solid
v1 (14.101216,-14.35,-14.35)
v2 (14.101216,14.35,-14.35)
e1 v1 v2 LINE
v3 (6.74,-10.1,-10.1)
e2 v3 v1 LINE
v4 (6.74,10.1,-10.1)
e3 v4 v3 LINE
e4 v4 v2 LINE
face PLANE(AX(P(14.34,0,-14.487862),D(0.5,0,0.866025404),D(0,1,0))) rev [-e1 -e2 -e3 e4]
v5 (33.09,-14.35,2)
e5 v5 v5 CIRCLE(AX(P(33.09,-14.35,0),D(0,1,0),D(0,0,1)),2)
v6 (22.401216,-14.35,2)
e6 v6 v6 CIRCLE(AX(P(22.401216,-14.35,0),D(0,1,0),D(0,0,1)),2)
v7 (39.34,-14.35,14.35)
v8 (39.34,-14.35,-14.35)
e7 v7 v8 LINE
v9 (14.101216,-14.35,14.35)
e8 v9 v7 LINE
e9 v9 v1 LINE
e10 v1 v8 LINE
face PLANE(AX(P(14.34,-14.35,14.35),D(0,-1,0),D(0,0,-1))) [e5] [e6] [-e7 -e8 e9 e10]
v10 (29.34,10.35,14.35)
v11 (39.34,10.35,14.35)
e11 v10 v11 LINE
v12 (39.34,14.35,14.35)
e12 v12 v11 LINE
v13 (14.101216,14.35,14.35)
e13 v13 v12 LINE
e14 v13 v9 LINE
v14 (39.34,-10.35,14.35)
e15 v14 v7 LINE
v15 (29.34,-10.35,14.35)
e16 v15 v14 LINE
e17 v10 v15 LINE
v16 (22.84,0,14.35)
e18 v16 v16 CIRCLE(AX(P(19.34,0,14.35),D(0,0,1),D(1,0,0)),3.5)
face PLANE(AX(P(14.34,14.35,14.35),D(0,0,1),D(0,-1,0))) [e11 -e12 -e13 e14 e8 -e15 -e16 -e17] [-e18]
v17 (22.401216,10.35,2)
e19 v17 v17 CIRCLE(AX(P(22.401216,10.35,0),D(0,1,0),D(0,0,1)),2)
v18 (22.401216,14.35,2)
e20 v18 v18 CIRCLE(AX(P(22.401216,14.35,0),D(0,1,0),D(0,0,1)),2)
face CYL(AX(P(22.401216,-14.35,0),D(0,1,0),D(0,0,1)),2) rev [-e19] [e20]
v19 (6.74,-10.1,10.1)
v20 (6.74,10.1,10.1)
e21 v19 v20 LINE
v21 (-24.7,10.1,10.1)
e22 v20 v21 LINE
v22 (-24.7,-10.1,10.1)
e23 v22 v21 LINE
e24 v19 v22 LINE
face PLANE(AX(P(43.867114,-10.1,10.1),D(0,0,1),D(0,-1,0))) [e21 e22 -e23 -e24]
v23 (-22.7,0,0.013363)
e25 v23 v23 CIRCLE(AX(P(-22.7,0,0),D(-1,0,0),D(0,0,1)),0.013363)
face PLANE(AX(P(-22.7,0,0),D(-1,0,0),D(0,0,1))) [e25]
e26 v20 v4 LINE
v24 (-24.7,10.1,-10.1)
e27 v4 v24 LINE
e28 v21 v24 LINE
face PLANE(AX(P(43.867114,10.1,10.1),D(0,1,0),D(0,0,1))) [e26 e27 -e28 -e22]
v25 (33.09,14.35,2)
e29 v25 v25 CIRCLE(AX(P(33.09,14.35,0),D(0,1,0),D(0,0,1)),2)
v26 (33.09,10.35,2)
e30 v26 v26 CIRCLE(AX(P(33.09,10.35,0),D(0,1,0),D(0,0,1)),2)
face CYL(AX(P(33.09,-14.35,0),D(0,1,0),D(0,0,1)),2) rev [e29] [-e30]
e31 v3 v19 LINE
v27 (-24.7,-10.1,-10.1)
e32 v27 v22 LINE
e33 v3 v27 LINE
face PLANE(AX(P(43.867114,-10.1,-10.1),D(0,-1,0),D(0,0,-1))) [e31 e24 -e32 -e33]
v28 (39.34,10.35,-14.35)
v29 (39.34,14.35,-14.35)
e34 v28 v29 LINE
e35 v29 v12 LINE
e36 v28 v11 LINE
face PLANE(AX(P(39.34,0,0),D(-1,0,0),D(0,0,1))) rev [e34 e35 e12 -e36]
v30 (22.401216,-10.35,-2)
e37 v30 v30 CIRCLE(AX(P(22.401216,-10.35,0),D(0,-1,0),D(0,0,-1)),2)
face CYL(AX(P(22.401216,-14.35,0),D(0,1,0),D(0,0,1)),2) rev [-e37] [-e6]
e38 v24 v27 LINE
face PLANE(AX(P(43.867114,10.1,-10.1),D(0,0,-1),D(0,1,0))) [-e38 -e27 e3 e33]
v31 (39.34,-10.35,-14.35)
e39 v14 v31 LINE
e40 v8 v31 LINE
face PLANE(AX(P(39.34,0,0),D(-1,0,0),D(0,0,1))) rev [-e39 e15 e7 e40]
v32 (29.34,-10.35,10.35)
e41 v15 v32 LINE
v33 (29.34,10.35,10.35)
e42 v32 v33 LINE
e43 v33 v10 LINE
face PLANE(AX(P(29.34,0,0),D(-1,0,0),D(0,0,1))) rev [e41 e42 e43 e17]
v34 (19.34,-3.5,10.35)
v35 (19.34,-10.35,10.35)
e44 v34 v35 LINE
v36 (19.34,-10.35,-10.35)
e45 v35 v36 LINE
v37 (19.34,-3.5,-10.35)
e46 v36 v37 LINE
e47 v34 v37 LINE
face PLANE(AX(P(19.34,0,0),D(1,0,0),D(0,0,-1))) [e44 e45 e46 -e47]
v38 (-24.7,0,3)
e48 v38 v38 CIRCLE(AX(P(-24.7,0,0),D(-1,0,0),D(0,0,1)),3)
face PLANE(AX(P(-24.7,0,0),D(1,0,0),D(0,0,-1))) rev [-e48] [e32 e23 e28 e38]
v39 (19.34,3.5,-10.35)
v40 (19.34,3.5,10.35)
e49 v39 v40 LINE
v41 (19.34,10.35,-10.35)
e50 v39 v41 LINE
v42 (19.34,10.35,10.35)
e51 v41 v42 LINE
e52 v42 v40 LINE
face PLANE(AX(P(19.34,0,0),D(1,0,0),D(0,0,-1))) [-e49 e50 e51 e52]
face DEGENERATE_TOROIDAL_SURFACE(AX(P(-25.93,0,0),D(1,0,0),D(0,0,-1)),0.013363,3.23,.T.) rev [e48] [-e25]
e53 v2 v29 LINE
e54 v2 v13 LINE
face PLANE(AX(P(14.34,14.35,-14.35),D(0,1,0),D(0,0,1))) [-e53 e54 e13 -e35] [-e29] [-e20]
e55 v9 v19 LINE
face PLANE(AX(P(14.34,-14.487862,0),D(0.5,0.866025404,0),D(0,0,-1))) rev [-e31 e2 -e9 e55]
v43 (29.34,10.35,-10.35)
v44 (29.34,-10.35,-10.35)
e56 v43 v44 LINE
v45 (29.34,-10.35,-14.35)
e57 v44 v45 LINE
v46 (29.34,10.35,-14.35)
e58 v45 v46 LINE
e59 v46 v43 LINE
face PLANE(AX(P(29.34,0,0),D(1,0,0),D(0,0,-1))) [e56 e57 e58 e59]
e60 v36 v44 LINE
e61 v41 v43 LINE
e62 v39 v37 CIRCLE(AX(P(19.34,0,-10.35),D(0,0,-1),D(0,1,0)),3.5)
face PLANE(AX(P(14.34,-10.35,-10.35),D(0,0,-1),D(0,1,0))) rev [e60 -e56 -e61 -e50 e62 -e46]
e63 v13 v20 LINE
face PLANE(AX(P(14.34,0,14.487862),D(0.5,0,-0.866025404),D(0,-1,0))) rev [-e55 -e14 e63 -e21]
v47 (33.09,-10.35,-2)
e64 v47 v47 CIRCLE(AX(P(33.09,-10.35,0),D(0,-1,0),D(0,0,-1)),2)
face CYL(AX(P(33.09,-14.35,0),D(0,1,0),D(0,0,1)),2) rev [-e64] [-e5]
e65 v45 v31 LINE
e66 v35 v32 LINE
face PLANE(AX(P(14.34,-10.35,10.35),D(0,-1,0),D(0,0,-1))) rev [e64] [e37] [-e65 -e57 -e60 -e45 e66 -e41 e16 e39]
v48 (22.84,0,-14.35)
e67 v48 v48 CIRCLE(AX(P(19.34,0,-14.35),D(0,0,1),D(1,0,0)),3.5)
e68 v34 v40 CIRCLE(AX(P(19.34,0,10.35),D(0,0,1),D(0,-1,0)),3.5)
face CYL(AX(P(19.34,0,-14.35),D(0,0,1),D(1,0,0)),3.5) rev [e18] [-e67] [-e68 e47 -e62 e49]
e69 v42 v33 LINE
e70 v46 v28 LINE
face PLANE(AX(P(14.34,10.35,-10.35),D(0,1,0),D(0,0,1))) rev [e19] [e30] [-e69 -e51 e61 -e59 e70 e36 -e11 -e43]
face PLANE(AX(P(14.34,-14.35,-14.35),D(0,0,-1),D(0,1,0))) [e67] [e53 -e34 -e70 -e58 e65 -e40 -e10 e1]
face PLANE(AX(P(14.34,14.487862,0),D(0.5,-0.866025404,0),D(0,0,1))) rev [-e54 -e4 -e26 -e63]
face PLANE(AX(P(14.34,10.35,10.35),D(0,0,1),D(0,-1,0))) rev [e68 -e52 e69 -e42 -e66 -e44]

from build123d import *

# Parameters (mm, degrees)
SKETCH1_W                 = 20
SKETCH1_H                 = 20
BOSS_EXTRUDE1_DEPTH       = 20
SKETCH2_W                 = 20
SKETCH2_H                 = 40.2
BOSS_EXTRUDE2_DEPTH       = 64.7
SKETCH3_W                 = 40.9
SKETCH3_H                 = 20.8
CUT_EXTRUDE1_DEPTH        = 90.320210479
SKETCH4_W                 = 11.9
SKETCH4_H                 = 40.2
CUT_EXTRUDE2_DEPTH        = 90.320210479
SKETCH5_R                 = 2.35
CUT_EXTRUDE3_DEPTH        = 10
SKETCH6_R                 = 2.35
CUT_EXTRUDE4_DEPTH        = 10
CHAMFER1_SIZE             = 1
SKETCH7_W                 = 20
SKETCH7_H                 = 10.1
BOSS_EXTRUDE4_DEPTH       = 4.7
SKETCH9_W                 = 20
SKETCH9_H                 = 20
BOSS_EXTRUDE5_DEPTH       = 24.7
SKETCH10_R                = 3
CUT_EXTRUDE5_DEPTH        = 2
FILLET1_R                 = 3.23
SKETCH11_W                = 20.2
SKETCH11_H                = 20.2
SKETCH11_W_2              = 20
SKETCH11_H_2              = 20
BOSS_EXTRUDE6_DEPTH       = 40
SKETCH12_R                = 3.35
BOSS_EXTRUDE7_DEPTH       = 0.1
BOSS_EXTRUDE8_DEPTH       = 0.1
SKETCH14_W                = 27.84115355
SKETCH14_H                = 50.628320261
CUT_EXTRUDE6_DEPTH        = 57.5
BOSS_EXTRUDE10_DEPTH      = 10
BOSS_EXTRUDE10_DEPTH_BACK = 0.96
SKETCH18_W                = 28.7
SKETCH18_H                = 28.7
SKETCH18_W_2              = 20.7
SKETCH18_H_2              = 20.7
SKETCH19_W                = 20.7
SKETCH19_H                = 20.7
BOSS_EXTRUDE11_DEPTH      = 4.04
SKETCH21_W                = 20.7
SKETCH21_H                = 20.7
BOSS_EXTRUDE13_DEPTH      = 0.96
SKETCH22_W                = 28.7
SKETCH22_H                = 28.7
SKETCH22_W_2              = 20.7
SKETCH22_H_2              = 20.7
BOSS_EXTRUDE14_DEPTH      = 14.04
CHAMFER2_SIZE             = 4.387862046
CHAMFER2_SIZE_2           = 7.6
SKETCH24_R                = 3.5
CUT_EXTRUDE7_DEPTH        = 51.76660418
SKETCH25_W                = 4
SKETCH25_H                = 20.7
CUT_EXTRUDE8_DEPTH        = 10
SKETCH26_R                = 2
CUT_EXTRUDE9_DEPTH        = 51.76660418


with BuildPart() as part:
    # Sketch1 → Boss-Extrude1 (new body)
    with BuildSketch(Plane(origin=(0, 0, 0), x_dir=(0, 0, -1), z_dir=(1, 0, 0))):
        Rectangle(SKETCH1_W, SKETCH1_H)
    extrude(amount=BOSS_EXTRUDE1_DEPTH)

    # Sketch2 → Boss-Extrude2 (add)
    with BuildSketch(Plane(origin=(20, 0, 0), x_dir=(0, 0, -1), z_dir=(1, 0, 0))):
        Rectangle(SKETCH2_W, SKETCH2_H)
    extrude(amount=BOSS_EXTRUDE2_DEPTH)

    # Sketch3 → Cut-Extrude1 (cut, through all)
    with BuildSketch(Plane.XY.offset(10)):
        with Locations((52.35, 0)):
            Rectangle(SKETCH3_W, SKETCH3_H)
    extrude(amount=-CUT_EXTRUDE1_DEPTH, mode=Mode.SUBTRACT)

    # Sketch4 → Cut-Extrude2 (cut, through all)
    with BuildSketch(Plane.XY.offset(10)):
        with Locations((78.75, 0)):
            Rectangle(SKETCH4_W, SKETCH4_H)
    extrude(amount=-CUT_EXTRUDE2_DEPTH, mode=Mode.SUBTRACT)

    # Sketch5 → Cut-Extrude3 (cut)
    with BuildSketch(Plane.XY.offset(10)):
        with Locations((28.01, 4.9)):
            Circle(SKETCH5_R)
        with Locations(Location((28.01, -4.9, 0), (0, 0, 180))):
            Circle(SKETCH5_R)
    extrude(amount=-CUT_EXTRUDE3_DEPTH, mode=Mode.SUBTRACT)

    # Sketch6 → Cut-Extrude4 (cut)
    with BuildSketch(Plane(origin=(72.8, 0, 0), x_dir=(0, 0, -1), z_dir=(1, 0, 0))):
        with Locations((0, -15.25)):
            Circle(SKETCH6_R)
        with Locations(Location((0, 15.25, 0), (0, 0, 180))):
            Circle(SKETCH6_R)
    extrude(amount=-CUT_EXTRUDE4_DEPTH, mode=Mode.SUBTRACT)

    # Chamfer1
    chamfer1_edges = [part.edges().sort_by_distance(p)[0] for p in [
        (25.66, 4.9, 10),
        (30.36, -4.9, 10),
        (72.8, -15.25, 2.35),
        (72.8, 15.25, -2.35),
    ]]
    chamfer(chamfer1_edges, length=CHAMFER1_SIZE)

    # Sketch7 → Boss-Extrude4 (add)
    with BuildSketch(Plane.ZY.offset(-20)):
        with Locations((0, 15.05)):
            Rectangle(SKETCH7_W, SKETCH7_H)
        with Locations((0, -15.05)):
            Rectangle(SKETCH7_W, SKETCH7_H)
    extrude(amount=BOSS_EXTRUDE4_DEPTH)

    # Sketch9 → Boss-Extrude5 (add)
    with BuildSketch(Plane.ZY):
        Rectangle(SKETCH9_W, SKETCH9_H)
    extrude(amount=BOSS_EXTRUDE5_DEPTH)

    # Sketch10 → Cut-Extrude5 (cut)
    with BuildSketch(Plane.ZY.offset(24.7)):
        Circle(SKETCH10_R)
    extrude(amount=-CUT_EXTRUDE5_DEPTH, mode=Mode.SUBTRACT)

    # Fillet1
    # the kernel refuses this fillet: 3.23 mm, written as the material it adds along each edge
    with BuildSketch(Plane(origin=(-22.7, 0, 0), x_dir=(0, 0, 1), z_dir=(0, -1, 0))) as fillet1_piece_1:
        with BuildLine():
            CenterArc((0.013363095, 3.23), FILLET1_R, 270, 67.616447755)
            Line((0.013363095, 0), (0.013363095, -0.0646))
            Line((0.013363095, -0.0646), (3, -0.0646))
            Line((3, -0.0646), (3.0646, 0))
            ThreePointArc((3.0646, 0), (3.0646, 1), (3.059732738, 1.9754))
            Line((3.059732738, 1.9754), (3, 2))
        make_face()
    revolve(axis=Axis((-22.7, 0, 0), (-1, 0, 0)))

    # Sketch11 → Boss-Extrude6 (add)
    with BuildSketch(Plane.ZY.offset(24.7)):
        Rectangle(SKETCH11_W, SKETCH11_H)
        Rectangle(SKETCH11_W_2, SKETCH11_H_2, mode=Mode.SUBTRACT)
    extrude(amount=-BOSS_EXTRUDE6_DEPTH)

    # Sketch12 → Boss-Extrude7 (add)
    with BuildSketch(Plane.XY.offset(10)):
        Polygon((72.8, 20.1), (15.3, 20.1), (15.3, -20.1), (72.8, -20.1), (72.8, -10.4), (31.9, -10.4), (31.9, 10.4), (72.8, 10.4), align=None)
        with Locations(Location((28.01, 4.9, 0), (0, 0, 180))):
            Circle(SKETCH12_R, mode=Mode.SUBTRACT)
        with Locations(Location((28.01, -4.9, 0), (0, 0, 180))):
            Circle(SKETCH12_R, mode=Mode.SUBTRACT)
    extrude(amount=BOSS_EXTRUDE7_DEPTH)

    # Sketch13 → Boss-Extrude8 (add)
    with BuildSketch(Plane(origin=(0, 0, -10), x_dir=(-1, 0, 0), z_dir=(0, 0, -1))):
        Polygon((-72.8, -20.1), (-15.3, -20.1), (-15.3, 20.1), (-72.8, 20.1), (-72.8, 10.4), (-31.9, 10.4), (-31.9, -10.4), (-72.8, -10.4), align=None)
    extrude(amount=BOSS_EXTRUDE8_DEPTH)

    # Sketch14 → Cut-Extrude6 (cut)
    with BuildSketch(Plane(origin=(72.8, 0, 0), x_dir=(0, 0, -1), z_dir=(1, 0, 0))):
        with Locations((-1.3978782, 0.184476051)):
            Rectangle(SKETCH14_W, SKETCH14_H)
    extrude(amount=-CUT_EXTRUDE6_DEPTH, mode=Mode.SUBTRACT)

    # Sketch19 → Boss-Extrude11 (add)
    with BuildSketch(Plane(origin=(15.3, 0, 0), x_dir=(0, 0, -1), z_dir=(1, 0, 0))):
        Rectangle(SKETCH19_W, SKETCH19_H)
    extrude(amount=BOSS_EXTRUDE11_DEPTH)



with BuildPart() as body_2:
    # Sketch18 → Boss-Extrude10 (new, two sides: drawn at the far end of the back side and taken through both)
    with BuildSketch(Plane(origin=(15.3, 0, 0), x_dir=(0, 0, -1), z_dir=(1, 0, 0)).offset(-BOSS_EXTRUDE10_DEPTH_BACK)):
        Rectangle(SKETCH18_W, SKETCH18_H)
        Rectangle(SKETCH18_W_2, SKETCH18_H_2, mode=Mode.SUBTRACT)
    extrude(amount=BOSS_EXTRUDE10_DEPTH + BOSS_EXTRUDE10_DEPTH_BACK)


with BuildPart() as part_1:
    add(part.part)

    add(body_2.part)  # Boss-Extrude13 merges body 2
    # Sketch21 → Boss-Extrude13 (add)
    with BuildSketch(Plane.ZY.offset(-15.3)):
        Rectangle(SKETCH21_W, SKETCH21_H)
    extrude(amount=BOSS_EXTRUDE13_DEPTH)

    # Sketch22 → Boss-Extrude14 (add)
    with BuildSketch(Plane(origin=(25.3, 0, 0), x_dir=(0, 0, -1), z_dir=(1, 0, 0))):
        Rectangle(SKETCH22_W, SKETCH22_H)
        Rectangle(SKETCH22_W_2, SKETCH22_H_2, mode=Mode.SUBTRACT)
    extrude(amount=BOSS_EXTRUDE14_DEPTH)

    # Chamfer2
    # the kernel refuses this chamfer: 7.6, 4.387862046 mm, written as the material it adds along each edge
    with BuildSketch(Plane(origin=(14.34, -10.1, 10.1), x_dir=(0.05789386240267072, -0.9983227437537925, 0), z_dir=(0, 0, -1))) as chamfer2_piece_1_section:
        Polygon((CHAMFER2_SIZE * 0.998322743718, CHAMFER2_SIZE * 0.0578938624006), (-CHAMFER2_SIZE_2 * 0.0578938624027, CHAMFER2_SIZE_2 * 0.998322743754), (0, 0), align=None)
    chamfer2_piece_1 = extrude(amount=20.2, mode=Mode.PRIVATE)
    chamfer2_piece_1 = split(chamfer2_piece_1, bisect_by=Plane(origin=(11.775225799, -14.35, 0), z_dir=(0, 1, 0)), keep=Keep.TOP, mode=Mode.PRIVATE)
    add(chamfer2_piece_1)
    with BuildSketch(Plane(origin=(14.34, -10.1, -10.1), x_dir=(0.05789386240267072, 0, -0.9983227437537925), z_dir=(0, 1, 0))) as chamfer2_piece_2_section:
        Polygon((CHAMFER2_SIZE * 0.998322743718, CHAMFER2_SIZE * 0.0578938624006), (-CHAMFER2_SIZE_2 * 0.0578938624027, CHAMFER2_SIZE_2 * 0.998322743754), (0, 0), align=None)
    chamfer2_piece_2 = extrude(amount=20.2, mode=Mode.PRIVATE)
    chamfer2_piece_2 = split(chamfer2_piece_2, bisect_by=Plane(origin=(11.775225799, 0, -14.35), z_dir=(0, 0, 1)), keep=Keep.TOP, mode=Mode.PRIVATE)
    add(chamfer2_piece_2)
    with BuildSketch(Plane(origin=(14.34, 10.1, -10.1), x_dir=(0.05789386240267072, 0.9983227437537925, 0), z_dir=(0, 0, 1))) as chamfer2_piece_3_section:
        Polygon((CHAMFER2_SIZE * 0.998322743718, CHAMFER2_SIZE * 0.0578938624006), (-CHAMFER2_SIZE_2 * 0.0578938624027, CHAMFER2_SIZE_2 * 0.998322743754), (0, 0), align=None)
    chamfer2_piece_3 = extrude(amount=20.2, mode=Mode.PRIVATE)
    chamfer2_piece_3 = split(chamfer2_piece_3, bisect_by=Plane(origin=(11.775225799, 14.35, 0), z_dir=(0, -1, 0)), keep=Keep.TOP, mode=Mode.PRIVATE)
    add(chamfer2_piece_3)
    with BuildSketch(Plane(origin=(14.34, 10.1, 10.1), x_dir=(0.05789386240267072, 0, 0.9983227437537925), z_dir=(0, -1, 0))) as chamfer2_piece_4_section:
        Polygon((CHAMFER2_SIZE * 0.998322743718, CHAMFER2_SIZE * 0.0578938624006), (-CHAMFER2_SIZE_2 * 0.0578938624027, CHAMFER2_SIZE_2 * 0.998322743754), (0, 0), align=None)
    chamfer2_piece_4 = extrude(amount=20.2, mode=Mode.PRIVATE)
    chamfer2_piece_4 = split(chamfer2_piece_4, bisect_by=Plane(origin=(11.775225799, 0, 14.35), z_dir=(0, 0, -1)), keep=Keep.TOP, mode=Mode.PRIVATE)
    add(chamfer2_piece_4)
    with BuildSketch(Plane(origin=(14.34, 10.1, 10.1), x_dir=(0.05789386240267072, 0, 0.9983227437537925), z_dir=(0, -1, 0))) as chamfer2_piece_5a_section:
        Polygon((CHAMFER2_SIZE * 0.998322743718, CHAMFER2_SIZE * 0.0578938624006), (-CHAMFER2_SIZE_2 * 0.0578938624027, CHAMFER2_SIZE_2 * 0.998322743754), (0, 0), align=None)
    chamfer2_piece_5a = extrude(amount=39.861851735, mode=Mode.PRIVATE)
    chamfer2_piece_5a = split(chamfer2_piece_5a, bisect_by=Plane(origin=(11.775225799, -14.35, 11.489810432), z_dir=(0, 1, 0)), keep=Keep.TOP, mode=Mode.PRIVATE)
    chamfer2_piece_5a = split(chamfer2_piece_5a, bisect_by=Plane(origin=(11.775225799, -12.225, 14.35), z_dir=(0, 0, -1)), keep=Keep.TOP, mode=Mode.PRIVATE)
    chamfer2_piece_5a = split(chamfer2_piece_5a, bisect_by=Plane(origin=(11.775225799, -10.1, 11.489810432), z_dir=(0, -1, 0)), keep=Keep.TOP, mode=Mode.PRIVATE)
    with BuildSketch(Plane(origin=(14.34, -10.1, 29.761851735), x_dir=(0.05789386240267072, -0.9983227437537925, 0), z_dir=(0, 0, -1))) as chamfer2_piece_5b_section:
        Polygon((CHAMFER2_SIZE * 0.998322743718, CHAMFER2_SIZE * 0.0578938624006), (-CHAMFER2_SIZE_2 * 0.0578938624027, CHAMFER2_SIZE_2 * 0.998322743754), (0, 0), align=None)
    chamfer2_piece_5b = extrude(amount=39.861851735, mode=Mode.PRIVATE)
    chamfer2_piece_5b = split(chamfer2_piece_5b, bisect_by=Plane(origin=(11.775225799, -14.35, 12.225), z_dir=(0, 1, 0)), keep=Keep.TOP, mode=Mode.PRIVATE)
    chamfer2_piece_5b = split(chamfer2_piece_5b, bisect_by=Plane(origin=(11.775225799, -11.489810432, 14.35), z_dir=(0, 0, -1)), keep=Keep.TOP, mode=Mode.PRIVATE)
    chamfer2_piece_5b = split(chamfer2_piece_5b, bisect_by=Plane(origin=(11.775225799, -11.489810432, 10.1), z_dir=(0, 0, 1)), keep=Keep.TOP, mode=Mode.PRIVATE)
    chamfer2_piece_5 = chamfer2_piece_5a & chamfer2_piece_5b
    add(chamfer2_piece_5)
    with BuildSketch(Plane(origin=(14.34, -10.1, 10.1), x_dir=(0.05789386240267072, -0.9983227437537925, 0), z_dir=(0, 0, -1))) as chamfer2_piece_6a_section:
        Polygon((CHAMFER2_SIZE * 0.998322743718, CHAMFER2_SIZE * 0.0578938624006), (-CHAMFER2_SIZE_2 * 0.0578938624027, CHAMFER2_SIZE_2 * 0.998322743754), (0, 0), align=None)
    chamfer2_piece_6a = extrude(amount=39.861851735, mode=Mode.PRIVATE)
    chamfer2_piece_6a = split(chamfer2_piece_6a, bisect_by=Plane(origin=(11.775225799, -11.489810432, -14.35), z_dir=(0, 0, 1)), keep=Keep.TOP, mode=Mode.PRIVATE)
    chamfer2_piece_6a = split(chamfer2_piece_6a, bisect_by=Plane(origin=(11.775225799, -14.35, -12.225), z_dir=(0, 1, 0)), keep=Keep.TOP, mode=Mode.PRIVATE)
    chamfer2_piece_6a = split(chamfer2_piece_6a, bisect_by=Plane(origin=(11.775225799, -11.489810432, -10.1), z_dir=(0, 0, -1)), keep=Keep.TOP, mode=Mode.PRIVATE)
    with BuildSketch(Plane(origin=(14.34, -29.761851735, -10.1), x_dir=(0.05789386240267072, 0, -0.9983227437537925), z_dir=(0, 1, 0))) as chamfer2_piece_6b_section:
        Polygon((CHAMFER2_SIZE * 0.998322743718, CHAMFER2_SIZE * 0.0578938624006), (-CHAMFER2_SIZE_2 * 0.0578938624027, CHAMFER2_SIZE_2 * 0.998322743754), (0, 0), align=None)
    chamfer2_piece_6b = extrude(amount=39.861851735, mode=Mode.PRIVATE)
    chamfer2_piece_6b = split(chamfer2_piece_6b, bisect_by=Plane(origin=(11.775225799, -12.225, -14.35), z_dir=(0, 0, 1)), keep=Keep.TOP, mode=Mode.PRIVATE)
    chamfer2_piece_6b = split(chamfer2_piece_6b, bisect_by=Plane(origin=(11.775225799, -14.35, -11.489810432), z_dir=(0, 1, 0)), keep=Keep.TOP, mode=Mode.PRIVATE)
    chamfer2_piece_6b = split(chamfer2_piece_6b, bisect_by=Plane(origin=(11.775225799, -10.1, -11.489810432), z_dir=(0, -1, 0)), keep=Keep.TOP, mode=Mode.PRIVATE)
    chamfer2_piece_6 = chamfer2_piece_6a & chamfer2_piece_6b
    add(chamfer2_piece_6)
    with BuildSketch(Plane(origin=(14.34, -10.1, -10.1), x_dir=(0.05789386240267072, 0, -0.9983227437537925), z_dir=(0, 1, 0))) as chamfer2_piece_7a_section:
        Polygon((CHAMFER2_SIZE * 0.998322743718, CHAMFER2_SIZE * 0.0578938624006), (-CHAMFER2_SIZE_2 * 0.0578938624027, CHAMFER2_SIZE_2 * 0.998322743754), (0, 0), align=None)
    chamfer2_piece_7a = extrude(amount=39.861851735, mode=Mode.PRIVATE)
    chamfer2_piece_7a = split(chamfer2_piece_7a, bisect_by=Plane(origin=(11.775225799, 12.225, -14.35), z_dir=(0, 0, 1)), keep=Keep.TOP, mode=Mode.PRIVATE)
    chamfer2_piece_7a = split(chamfer2_piece_7a, bisect_by=Plane(origin=(11.775225799, 14.35, -11.489810432), z_dir=(0, -1, 0)), keep=Keep.TOP, mode=Mode.PRIVATE)
    chamfer2_piece_7a = split(chamfer2_piece_7a, bisect_by=Plane(origin=(11.775225799, 10.1, -11.489810432), z_dir=(0, 1, 0)), keep=Keep.TOP, mode=Mode.PRIVATE)
    with BuildSketch(Plane(origin=(14.34, 10.1, -29.761851735), x_dir=(0.05789386240267072, 0.9983227437537925, 0), z_dir=(0, 0, 1))) as chamfer2_piece_7b_section:
        Polygon((CHAMFER2_SIZE * 0.998322743718, CHAMFER2_SIZE * 0.0578938624006), (-CHAMFER2_SIZE_2 * 0.0578938624027, CHAMFER2_SIZE_2 * 0.998322743754), (0, 0), align=None)
    chamfer2_piece_7b = extrude(amount=39.861851735, mode=Mode.PRIVATE)
    chamfer2_piece_7b = split(chamfer2_piece_7b, bisect_by=Plane(origin=(11.775225799, 11.489810432, -14.35), z_dir=(0, 0, 1)), keep=Keep.TOP, mode=Mode.PRIVATE)
    chamfer2_piece_7b = split(chamfer2_piece_7b, bisect_by=Plane(origin=(11.775225799, 14.35, -12.225), z_dir=(0, -1, 0)), keep=Keep.TOP, mode=Mode.PRIVATE)
    chamfer2_piece_7b = split(chamfer2_piece_7b, bisect_by=Plane(origin=(11.775225799, 11.489810432, -10.1), z_dir=(0, 0, -1)), keep=Keep.TOP, mode=Mode.PRIVATE)
    chamfer2_piece_7 = chamfer2_piece_7a & chamfer2_piece_7b
    add(chamfer2_piece_7)
    with BuildSketch(Plane(origin=(14.34, 29.761851735, 10.1), x_dir=(0.05789386240267072, 0, 0.9983227437537925), z_dir=(0, -1, 0))) as chamfer2_piece_8a_section:
        Polygon((CHAMFER2_SIZE * 0.998322743718, CHAMFER2_SIZE * 0.0578938624006), (-CHAMFER2_SIZE_2 * 0.0578938624027, CHAMFER2_SIZE_2 * 0.998322743754), (0, 0), align=None)
    chamfer2_piece_8a = extrude(amount=39.861851735, mode=Mode.PRIVATE)
    chamfer2_piece_8a = split(chamfer2_piece_8a, bisect_by=Plane(origin=(11.775225799, 12.225, 14.35), z_dir=(0, 0, -1)), keep=Keep.TOP, mode=Mode.PRIVATE)
    chamfer2_piece_8a = split(chamfer2_piece_8a, bisect_by=Plane(origin=(11.775225799, 14.35, 11.489810432), z_dir=(0, -1, 0)), keep=Keep.TOP, mode=Mode.PRIVATE)
    chamfer2_piece_8a = split(chamfer2_piece_8a, bisect_by=Plane(origin=(11.775225799, 10.1, 11.489810432), z_dir=(0, 1, 0)), keep=Keep.TOP, mode=Mode.PRIVATE)
    with BuildSketch(Plane(origin=(14.34, 10.1, -10.1), x_dir=(0.05789386240267072, 0.9983227437537925, 0), z_dir=(0, 0, 1))) as chamfer2_piece_8b_section:
        Polygon((CHAMFER2_SIZE * 0.998322743718, CHAMFER2_SIZE * 0.0578938624006), (-CHAMFER2_SIZE_2 * 0.0578938624027, CHAMFER2_SIZE_2 * 0.998322743754), (0, 0), align=None)
    chamfer2_piece_8b = extrude(amount=39.861851735, mode=Mode.PRIVATE)
    chamfer2_piece_8b = split(chamfer2_piece_8b, bisect_by=Plane(origin=(11.775225799, 11.489810432, 14.35), z_dir=(0, 0, -1)), keep=Keep.TOP, mode=Mode.PRIVATE)
    chamfer2_piece_8b = split(chamfer2_piece_8b, bisect_by=Plane(origin=(11.775225799, 14.35, 12.225), z_dir=(0, -1, 0)), keep=Keep.TOP, mode=Mode.PRIVATE)
    chamfer2_piece_8b = split(chamfer2_piece_8b, bisect_by=Plane(origin=(11.775225799, 11.489810432, 10.1), z_dir=(0, 0, 1)), keep=Keep.TOP, mode=Mode.PRIVATE)
    chamfer2_piece_8 = chamfer2_piece_8a & chamfer2_piece_8b
    add(chamfer2_piece_8)

    # Sketch24 → Cut-Extrude7 (cut, through all)
    with BuildSketch(Plane.XY.offset(14.35)):
        with Locations((19.34, 0)):
            Circle(SKETCH24_R)
    extrude(amount=-CUT_EXTRUDE7_DEPTH, mode=Mode.SUBTRACT)

    # Sketch25 → Cut-Extrude8 (cut)
    with BuildSketch(Plane(origin=(39.34, 0, 0), x_dir=(0, 0, -1), z_dir=(1, 0, 0))):
        with Locations((-12.35, 0)):
            Rectangle(SKETCH25_W, SKETCH25_H)
        with Locations((12.35, 0)):
            Rectangle(SKETCH25_W, SKETCH25_H)
    extrude(amount=-CUT_EXTRUDE8_DEPTH, mode=Mode.SUBTRACT)

    # Sketch26 → Cut-Extrude9 (cut, through all)
    with BuildSketch(Plane(origin=(0, 14.35, 0), x_dir=(1, 0, 0), z_dir=(0, 1, 0))):
        with Locations(Location((33.09, 0, 0), (0, 0, 270))):
            Circle(SKETCH26_R)
        with Locations(Location((22.401215932, 0, 0), (0, 0, 270))):
            Circle(SKETCH26_R)
    extrude(amount=-CUT_EXTRUDE9_DEPTH, mode=Mode.SUBTRACT)


solid = part_1.part
